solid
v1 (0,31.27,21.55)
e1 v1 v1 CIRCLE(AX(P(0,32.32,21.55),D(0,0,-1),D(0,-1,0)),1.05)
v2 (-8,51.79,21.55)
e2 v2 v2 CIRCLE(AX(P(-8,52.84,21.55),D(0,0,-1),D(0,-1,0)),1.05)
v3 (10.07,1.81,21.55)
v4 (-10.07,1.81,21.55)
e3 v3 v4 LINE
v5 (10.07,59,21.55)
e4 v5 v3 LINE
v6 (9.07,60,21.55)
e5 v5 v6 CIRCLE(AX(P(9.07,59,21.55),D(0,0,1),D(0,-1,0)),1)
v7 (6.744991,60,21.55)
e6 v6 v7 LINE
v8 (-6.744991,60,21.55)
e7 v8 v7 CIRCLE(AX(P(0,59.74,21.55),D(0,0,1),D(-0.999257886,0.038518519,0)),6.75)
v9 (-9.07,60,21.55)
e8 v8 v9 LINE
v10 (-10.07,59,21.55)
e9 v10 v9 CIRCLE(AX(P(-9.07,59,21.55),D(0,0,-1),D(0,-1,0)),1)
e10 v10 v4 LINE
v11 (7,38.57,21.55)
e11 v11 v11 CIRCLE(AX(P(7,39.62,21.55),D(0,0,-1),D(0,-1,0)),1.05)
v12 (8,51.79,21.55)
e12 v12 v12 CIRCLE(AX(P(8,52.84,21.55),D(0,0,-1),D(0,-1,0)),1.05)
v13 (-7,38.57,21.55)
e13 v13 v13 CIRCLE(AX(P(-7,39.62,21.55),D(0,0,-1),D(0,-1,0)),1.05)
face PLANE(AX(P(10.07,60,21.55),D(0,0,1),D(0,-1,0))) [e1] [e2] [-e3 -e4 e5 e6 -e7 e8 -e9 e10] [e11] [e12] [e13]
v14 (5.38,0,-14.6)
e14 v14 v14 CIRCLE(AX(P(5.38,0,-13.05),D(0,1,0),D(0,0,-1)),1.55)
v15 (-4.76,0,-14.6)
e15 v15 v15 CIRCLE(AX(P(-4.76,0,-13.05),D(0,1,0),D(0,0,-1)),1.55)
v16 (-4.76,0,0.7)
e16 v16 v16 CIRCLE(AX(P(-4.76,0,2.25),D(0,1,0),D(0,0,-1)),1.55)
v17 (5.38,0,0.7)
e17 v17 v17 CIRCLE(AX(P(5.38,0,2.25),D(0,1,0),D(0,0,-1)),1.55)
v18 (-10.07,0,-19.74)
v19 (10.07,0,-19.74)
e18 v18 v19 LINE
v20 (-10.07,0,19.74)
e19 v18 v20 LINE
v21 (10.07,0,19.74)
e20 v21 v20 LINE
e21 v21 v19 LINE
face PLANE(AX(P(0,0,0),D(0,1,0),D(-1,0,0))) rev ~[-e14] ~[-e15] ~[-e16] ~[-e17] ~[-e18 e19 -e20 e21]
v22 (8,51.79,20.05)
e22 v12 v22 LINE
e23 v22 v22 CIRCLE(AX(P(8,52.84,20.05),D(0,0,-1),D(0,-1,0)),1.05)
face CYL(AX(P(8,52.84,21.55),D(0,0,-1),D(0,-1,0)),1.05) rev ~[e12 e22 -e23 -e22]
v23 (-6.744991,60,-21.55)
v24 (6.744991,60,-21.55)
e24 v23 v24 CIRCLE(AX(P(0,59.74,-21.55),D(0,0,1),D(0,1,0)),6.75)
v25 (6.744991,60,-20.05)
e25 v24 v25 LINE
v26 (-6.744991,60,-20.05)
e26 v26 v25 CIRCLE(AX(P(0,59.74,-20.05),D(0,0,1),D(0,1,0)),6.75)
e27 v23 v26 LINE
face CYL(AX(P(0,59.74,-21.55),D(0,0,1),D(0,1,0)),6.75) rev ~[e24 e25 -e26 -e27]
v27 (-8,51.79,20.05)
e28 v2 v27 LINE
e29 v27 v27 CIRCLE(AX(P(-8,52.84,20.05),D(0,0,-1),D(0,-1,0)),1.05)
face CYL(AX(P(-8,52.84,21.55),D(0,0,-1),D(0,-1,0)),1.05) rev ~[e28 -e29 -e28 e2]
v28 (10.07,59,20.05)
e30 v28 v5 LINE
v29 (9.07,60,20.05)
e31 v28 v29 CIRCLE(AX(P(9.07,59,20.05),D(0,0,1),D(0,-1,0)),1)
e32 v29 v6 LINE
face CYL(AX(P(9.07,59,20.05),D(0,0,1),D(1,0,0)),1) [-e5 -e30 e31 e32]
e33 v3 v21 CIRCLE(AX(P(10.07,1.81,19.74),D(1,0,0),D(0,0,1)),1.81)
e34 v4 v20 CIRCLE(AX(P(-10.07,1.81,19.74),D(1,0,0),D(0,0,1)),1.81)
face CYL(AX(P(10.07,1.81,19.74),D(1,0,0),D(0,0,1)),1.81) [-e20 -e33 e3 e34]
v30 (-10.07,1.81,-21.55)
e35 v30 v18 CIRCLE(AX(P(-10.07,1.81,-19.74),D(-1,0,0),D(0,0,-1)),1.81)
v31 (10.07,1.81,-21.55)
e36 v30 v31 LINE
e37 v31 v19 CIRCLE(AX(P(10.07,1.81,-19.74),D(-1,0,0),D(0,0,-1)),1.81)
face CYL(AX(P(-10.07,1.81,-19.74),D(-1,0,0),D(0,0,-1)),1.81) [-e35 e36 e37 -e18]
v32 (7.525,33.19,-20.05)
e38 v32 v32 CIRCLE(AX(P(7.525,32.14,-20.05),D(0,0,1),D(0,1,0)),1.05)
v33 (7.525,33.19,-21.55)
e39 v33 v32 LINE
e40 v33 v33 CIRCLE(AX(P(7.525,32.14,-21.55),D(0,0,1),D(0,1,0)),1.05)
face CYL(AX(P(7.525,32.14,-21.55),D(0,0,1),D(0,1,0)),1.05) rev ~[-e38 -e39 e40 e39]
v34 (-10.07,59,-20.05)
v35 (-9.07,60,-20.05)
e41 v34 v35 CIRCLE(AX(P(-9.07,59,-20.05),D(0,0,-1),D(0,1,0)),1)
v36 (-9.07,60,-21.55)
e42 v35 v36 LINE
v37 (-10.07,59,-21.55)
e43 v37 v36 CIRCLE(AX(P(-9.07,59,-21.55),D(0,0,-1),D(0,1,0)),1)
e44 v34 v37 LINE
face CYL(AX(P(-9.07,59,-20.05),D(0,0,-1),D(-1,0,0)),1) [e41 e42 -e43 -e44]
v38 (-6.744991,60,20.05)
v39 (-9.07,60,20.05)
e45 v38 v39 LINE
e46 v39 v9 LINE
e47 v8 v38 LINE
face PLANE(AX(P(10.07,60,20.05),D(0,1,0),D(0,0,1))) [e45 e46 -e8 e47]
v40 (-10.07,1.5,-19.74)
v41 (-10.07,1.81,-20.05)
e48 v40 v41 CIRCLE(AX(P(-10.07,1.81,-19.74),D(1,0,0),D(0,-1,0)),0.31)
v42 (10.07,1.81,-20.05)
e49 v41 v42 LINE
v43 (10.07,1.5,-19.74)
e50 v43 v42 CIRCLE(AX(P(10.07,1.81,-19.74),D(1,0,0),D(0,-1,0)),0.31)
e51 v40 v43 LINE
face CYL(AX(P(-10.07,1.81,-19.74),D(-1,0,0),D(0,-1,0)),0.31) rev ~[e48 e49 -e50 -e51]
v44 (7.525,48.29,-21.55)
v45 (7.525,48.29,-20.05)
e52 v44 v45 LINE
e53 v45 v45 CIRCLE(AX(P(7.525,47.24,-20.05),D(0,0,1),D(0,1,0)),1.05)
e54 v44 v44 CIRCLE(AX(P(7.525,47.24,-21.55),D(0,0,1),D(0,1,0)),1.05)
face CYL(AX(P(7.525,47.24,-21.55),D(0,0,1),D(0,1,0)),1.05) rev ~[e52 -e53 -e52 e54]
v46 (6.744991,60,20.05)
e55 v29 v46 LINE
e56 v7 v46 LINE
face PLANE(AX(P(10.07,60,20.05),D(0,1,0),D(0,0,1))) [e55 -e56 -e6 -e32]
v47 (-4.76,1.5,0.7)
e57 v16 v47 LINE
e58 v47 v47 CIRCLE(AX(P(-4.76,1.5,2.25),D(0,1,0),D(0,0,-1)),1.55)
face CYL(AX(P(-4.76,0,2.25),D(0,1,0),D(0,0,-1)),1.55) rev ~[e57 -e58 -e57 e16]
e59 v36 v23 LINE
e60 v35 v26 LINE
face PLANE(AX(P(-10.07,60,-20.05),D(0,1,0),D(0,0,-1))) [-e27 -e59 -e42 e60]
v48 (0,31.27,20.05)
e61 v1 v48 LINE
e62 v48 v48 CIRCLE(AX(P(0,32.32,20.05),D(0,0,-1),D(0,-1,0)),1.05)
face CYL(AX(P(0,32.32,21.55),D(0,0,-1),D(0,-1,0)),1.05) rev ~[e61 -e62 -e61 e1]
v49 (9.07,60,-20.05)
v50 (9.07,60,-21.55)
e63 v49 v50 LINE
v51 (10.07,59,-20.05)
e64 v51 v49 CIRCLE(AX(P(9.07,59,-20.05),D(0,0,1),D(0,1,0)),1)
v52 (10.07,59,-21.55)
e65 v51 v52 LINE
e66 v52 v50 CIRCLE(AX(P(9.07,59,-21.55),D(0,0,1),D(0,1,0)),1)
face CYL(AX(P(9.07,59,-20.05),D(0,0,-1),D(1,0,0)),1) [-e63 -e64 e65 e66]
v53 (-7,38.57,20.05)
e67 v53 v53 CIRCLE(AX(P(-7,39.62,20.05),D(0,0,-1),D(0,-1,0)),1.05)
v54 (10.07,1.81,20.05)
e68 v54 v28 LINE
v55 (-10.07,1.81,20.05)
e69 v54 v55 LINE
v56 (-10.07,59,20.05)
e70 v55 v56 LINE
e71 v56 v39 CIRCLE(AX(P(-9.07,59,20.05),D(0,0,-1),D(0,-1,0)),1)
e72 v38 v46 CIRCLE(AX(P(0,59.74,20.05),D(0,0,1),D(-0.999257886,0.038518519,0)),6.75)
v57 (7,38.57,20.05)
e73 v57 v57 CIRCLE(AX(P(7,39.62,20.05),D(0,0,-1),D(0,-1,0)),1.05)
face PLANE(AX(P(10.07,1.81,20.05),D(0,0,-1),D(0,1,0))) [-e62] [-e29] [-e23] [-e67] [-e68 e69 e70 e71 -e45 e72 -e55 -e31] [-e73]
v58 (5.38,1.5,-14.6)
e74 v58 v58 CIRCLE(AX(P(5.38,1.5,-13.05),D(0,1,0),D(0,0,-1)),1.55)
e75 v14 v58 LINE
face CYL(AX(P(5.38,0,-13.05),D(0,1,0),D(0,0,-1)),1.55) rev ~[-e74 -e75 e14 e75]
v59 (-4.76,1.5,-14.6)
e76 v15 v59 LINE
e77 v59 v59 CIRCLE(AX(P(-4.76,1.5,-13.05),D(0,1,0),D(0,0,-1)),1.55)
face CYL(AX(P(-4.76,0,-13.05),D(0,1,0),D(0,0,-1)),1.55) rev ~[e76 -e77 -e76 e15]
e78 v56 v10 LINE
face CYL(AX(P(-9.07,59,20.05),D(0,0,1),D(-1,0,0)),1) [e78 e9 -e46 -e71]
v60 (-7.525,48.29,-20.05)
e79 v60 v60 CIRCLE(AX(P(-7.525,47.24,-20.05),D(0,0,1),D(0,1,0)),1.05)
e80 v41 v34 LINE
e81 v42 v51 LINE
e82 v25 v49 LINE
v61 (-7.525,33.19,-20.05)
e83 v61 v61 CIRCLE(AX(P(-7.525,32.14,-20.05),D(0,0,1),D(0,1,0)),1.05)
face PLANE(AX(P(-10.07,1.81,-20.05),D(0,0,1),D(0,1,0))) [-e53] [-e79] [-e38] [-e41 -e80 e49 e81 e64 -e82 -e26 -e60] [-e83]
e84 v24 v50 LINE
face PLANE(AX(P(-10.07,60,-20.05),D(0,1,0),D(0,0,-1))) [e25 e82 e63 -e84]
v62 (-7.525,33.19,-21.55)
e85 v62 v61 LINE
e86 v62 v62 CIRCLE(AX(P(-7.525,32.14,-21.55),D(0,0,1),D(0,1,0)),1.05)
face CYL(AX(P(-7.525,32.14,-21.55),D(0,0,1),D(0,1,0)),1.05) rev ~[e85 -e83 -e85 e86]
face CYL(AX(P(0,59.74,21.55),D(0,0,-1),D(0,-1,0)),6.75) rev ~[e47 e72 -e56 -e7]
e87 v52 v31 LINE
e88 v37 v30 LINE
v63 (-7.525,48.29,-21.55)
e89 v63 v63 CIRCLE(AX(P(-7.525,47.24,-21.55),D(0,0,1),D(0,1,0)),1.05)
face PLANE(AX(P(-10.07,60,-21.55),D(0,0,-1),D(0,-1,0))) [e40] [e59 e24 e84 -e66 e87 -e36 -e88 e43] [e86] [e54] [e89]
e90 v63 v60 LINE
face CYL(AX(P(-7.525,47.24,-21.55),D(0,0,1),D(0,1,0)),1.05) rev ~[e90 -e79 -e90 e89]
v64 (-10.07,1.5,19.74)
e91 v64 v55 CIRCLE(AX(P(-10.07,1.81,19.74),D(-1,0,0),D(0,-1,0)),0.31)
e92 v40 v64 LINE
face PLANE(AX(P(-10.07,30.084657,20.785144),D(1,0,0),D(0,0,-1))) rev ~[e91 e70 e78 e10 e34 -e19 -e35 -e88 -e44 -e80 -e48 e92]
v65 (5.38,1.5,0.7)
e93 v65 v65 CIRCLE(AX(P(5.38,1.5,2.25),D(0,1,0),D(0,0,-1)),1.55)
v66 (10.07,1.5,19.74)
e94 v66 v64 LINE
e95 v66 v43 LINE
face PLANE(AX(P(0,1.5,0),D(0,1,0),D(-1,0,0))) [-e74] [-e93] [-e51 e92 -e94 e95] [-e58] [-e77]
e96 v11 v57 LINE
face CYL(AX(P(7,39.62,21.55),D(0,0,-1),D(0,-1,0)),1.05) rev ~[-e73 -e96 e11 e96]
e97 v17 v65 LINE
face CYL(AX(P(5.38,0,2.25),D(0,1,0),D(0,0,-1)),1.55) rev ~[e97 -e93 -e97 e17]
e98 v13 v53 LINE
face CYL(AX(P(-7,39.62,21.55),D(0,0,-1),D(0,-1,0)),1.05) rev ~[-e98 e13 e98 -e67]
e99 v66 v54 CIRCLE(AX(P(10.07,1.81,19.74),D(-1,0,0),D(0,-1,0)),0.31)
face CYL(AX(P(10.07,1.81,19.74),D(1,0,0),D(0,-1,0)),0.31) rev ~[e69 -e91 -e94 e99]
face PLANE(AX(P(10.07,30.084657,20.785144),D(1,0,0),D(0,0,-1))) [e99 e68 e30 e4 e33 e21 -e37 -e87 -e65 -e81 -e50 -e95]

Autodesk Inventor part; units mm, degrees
ref_plane "YZ Plane" through (0, 0, 0) normal (1, 0, 0) x (0, 1, 0)
ref_plane "XZ Plane" through (0, 0, 0) normal (0, 1, 0) x (-1, 0, 0)
ref_plane "XY Plane" through (0, 0, 0) normal (0, 0, 1) x (1, 0, 0)
sketch "Sketch1" plane through (0, 0, 0) normal (0, 1, 0) x (-1, 0, 0)
  line L0 (10.07, 20.05) -> (-10.07, 20.05)
  line L1 (-10.07, 20.05) -> (-10.07, -20.05)
  line L2 (-10.07, -20.05) -> (10.07, -20.05)
  line L3 (10.07, -20.05) -> (10.07, 20.05)
  point P0 (0, 0)
  dimension "d0" = 40.1
  dimension "d1" = 20.14
  dimension "d2" = 10.07
  dimension "d3" = 20.05
extrude "Plate1" add sketch "Sketch1" along normal blind 1.5
sketch "Sketch2" plane through (10.07, 0, 21.55) normal (0, 0, -1) x (-1, 0, 0)
  line L0 (20.14, 0) -> (0, 0)
  line L1 (0, 0) -> (0, 60)
  line L2 (0, 60) -> (20.14, 60)
  line L3 (20.14, 60) -> (20.14, 0)
edge flange "Flange1" height 60 angle 90 thickness 1.5 bend radius 0.31 thickness toward (0, 0, -1) relief tear relief width 1.5 relief depth 0.75 corner gap 0.31 corner form 0 edges at (0, 1.5, 20.05) (0, 1.5, -20.05) wall of the first edge with corners at (-10.07, 0, 21.55) (10.07, 0, 21.55) (10.07, 60, 21.55) (-10.07, 60, 21.55)
bend "Bend1"
corner "Corner1"
sketch "Sketch15" plane through (10.07, 60, -21.55) normal (0, 0, -1) x (-1, 0, 0)
  circle A0 centre (2.545, -12.76) radius 0.7835
  circle A1 centre (17.595, -12.76) radius 0.7835
  circle A2 centre (2.545, -27.86) radius 0.7835
  circle A3 centre (17.595, -27.86) radius 0.7835
  point P0 (10.07, -60)
hole "Hole9" at (7.525, 47.24, -21.55) at (-7.525, 47.24, -21.55) at (7.525, 32.14, -21.55) at (-7.525, 32.14, -21.55) direction (0, 0, 1) diameter 2.1 depth 1.5
sketch "Sketch16" plane through (-10.07, 60, 21.55) normal (0, 0, 1) x (1, 0, 0)
  circle A0 centre (18.07, -7.16) radius 0.7835
  circle A1 centre (2.07, -7.16) radius 0.7835
  circle A2 centre (3.07, -20.38) radius 0.7835
  circle A3 centre (17.07, -20.38) radius 0.7835
  circle A4 centre (10.07, -27.68) radius 0.7835
  point P0 (10.07, -60)
hole "Hole10" at (-8, 52.84, 21.55) at (8, 52.84, 21.55) at (-7, 39.62, 21.55) at (7, 39.62, 21.55) at (0, 32.32, 21.55) direction (0, 0, -1) diameter 2.1 depth 1.5
sketch "Sketch17" plane through (-10.07, 60, 21.55) normal (0, 0, 1) x (1, 0, 0)
  point P0 (10.07, -60)
sketch "Sketch18" plane through (-10.07, 60, 21.55) normal (0, 0, 1) x (1, 0, 0)
  point P0 (10.07, -60)
sketch "Sketch19" plane through (-10.07, 60, 21.55) normal (0, 0, 1) x (1, 0, 0)
  circle A0 centre (10.07, -0.26) radius 6
  point P0 (10.07, -60)
sketch "Sketch20" plane through (10.07, 60, -21.55) normal (0, 0, -1) x (-1, 0, 0)
  circle A0 centre (10.07, -0.26) radius 6
  point P0 (10.07, -60)
fillet "Corner Round1" radius 1 4 edges at (-10.07, 60, 20.8) (-10.07, 60, -20.8) (10.07, 60, -20.8) (10.07, 60, 20.8)
sketch "Sketch22" plane through (0, 1.5, 0) normal (0, 1, 0) x (1, 0, 0)
  point P0 (0, 0)
sketch "Sketch23" plane through (0, 1.5, 0) normal (0, 1, 0) x (1, 0, 0)
  point P0 (0, 0)
hole "Hole13" at (0, 59.74, -21.55) direction (0, 0, 1) diameter 13.5 depth 1.5
hole "Hole14" at (0, 59.74, 21.55) direction (0, 0, -1) diameter 13.5 depth 1.5
sketch "Sketch25" plane through (0, 0, 0) normal (0, -1, 0) x (1, 0, 0)
  circle A0 centre (-4.76, -13.05) radius 1.55 projected
  circle A1 centre (-4.76, 2.25) radius 1.55 projected
  circle A2 centre (5.38, -13.05) radius 1.55 projected
  circle A3 centre (5.38, 2.25) radius 1.55 projected
  point P0 (0, 0)
hole "Hole15" at (-4.76, 0, -13.05) at (5.38, 0, -13.05) at (-4.76, 0, 2.25) at (5.38, 0, 2.25) direction (0, 1, 0) diameter 3.1 depth 1.5
equation "\"d96\" = Thickness"
equation "\"d103\" = Thickness"
equation "\"d131\" = Thickness"
equation "\"d138\" = Thickness"
equation "\"d145\" = Thickness"
equation "\"d4\" = Thickness"
equation "\"d5\" = BendReliefWidth"
equation "\"d6\" = BendReliefDepth"
equation "\"d7\" = MinimumRemnant"
equation "\"d8\" = TransitionRadius"
equation "\"d11\" = BendRadius"
equation "\"d12\" = CornerReliefSize"
equation "\"d13\" = GapSize"
equation "\"d14\" = JacobiRadiusSize"
equation "\"BendReliefWidth\" = Thickness"
equation "\"BendReliefDepth\" = 0.5 * Thickness"
equation "\"CornerReliefSize\" = 4 * Thickness"
equation "\"MinimumRemnant\" = 2 * Thickness"
equation "\"TransitionRadius\" = BendRadius"
equation "\"JacobiRadiusSize\" = BendRadius"
equation "\"GapSize\" = Thickness"
equation "\"Thickness\" = 1.5"
equation "\"BendRadius\" = 0.31"
properties part number "axis_16_top_frame" material "Aluminum 6061-AHC"
